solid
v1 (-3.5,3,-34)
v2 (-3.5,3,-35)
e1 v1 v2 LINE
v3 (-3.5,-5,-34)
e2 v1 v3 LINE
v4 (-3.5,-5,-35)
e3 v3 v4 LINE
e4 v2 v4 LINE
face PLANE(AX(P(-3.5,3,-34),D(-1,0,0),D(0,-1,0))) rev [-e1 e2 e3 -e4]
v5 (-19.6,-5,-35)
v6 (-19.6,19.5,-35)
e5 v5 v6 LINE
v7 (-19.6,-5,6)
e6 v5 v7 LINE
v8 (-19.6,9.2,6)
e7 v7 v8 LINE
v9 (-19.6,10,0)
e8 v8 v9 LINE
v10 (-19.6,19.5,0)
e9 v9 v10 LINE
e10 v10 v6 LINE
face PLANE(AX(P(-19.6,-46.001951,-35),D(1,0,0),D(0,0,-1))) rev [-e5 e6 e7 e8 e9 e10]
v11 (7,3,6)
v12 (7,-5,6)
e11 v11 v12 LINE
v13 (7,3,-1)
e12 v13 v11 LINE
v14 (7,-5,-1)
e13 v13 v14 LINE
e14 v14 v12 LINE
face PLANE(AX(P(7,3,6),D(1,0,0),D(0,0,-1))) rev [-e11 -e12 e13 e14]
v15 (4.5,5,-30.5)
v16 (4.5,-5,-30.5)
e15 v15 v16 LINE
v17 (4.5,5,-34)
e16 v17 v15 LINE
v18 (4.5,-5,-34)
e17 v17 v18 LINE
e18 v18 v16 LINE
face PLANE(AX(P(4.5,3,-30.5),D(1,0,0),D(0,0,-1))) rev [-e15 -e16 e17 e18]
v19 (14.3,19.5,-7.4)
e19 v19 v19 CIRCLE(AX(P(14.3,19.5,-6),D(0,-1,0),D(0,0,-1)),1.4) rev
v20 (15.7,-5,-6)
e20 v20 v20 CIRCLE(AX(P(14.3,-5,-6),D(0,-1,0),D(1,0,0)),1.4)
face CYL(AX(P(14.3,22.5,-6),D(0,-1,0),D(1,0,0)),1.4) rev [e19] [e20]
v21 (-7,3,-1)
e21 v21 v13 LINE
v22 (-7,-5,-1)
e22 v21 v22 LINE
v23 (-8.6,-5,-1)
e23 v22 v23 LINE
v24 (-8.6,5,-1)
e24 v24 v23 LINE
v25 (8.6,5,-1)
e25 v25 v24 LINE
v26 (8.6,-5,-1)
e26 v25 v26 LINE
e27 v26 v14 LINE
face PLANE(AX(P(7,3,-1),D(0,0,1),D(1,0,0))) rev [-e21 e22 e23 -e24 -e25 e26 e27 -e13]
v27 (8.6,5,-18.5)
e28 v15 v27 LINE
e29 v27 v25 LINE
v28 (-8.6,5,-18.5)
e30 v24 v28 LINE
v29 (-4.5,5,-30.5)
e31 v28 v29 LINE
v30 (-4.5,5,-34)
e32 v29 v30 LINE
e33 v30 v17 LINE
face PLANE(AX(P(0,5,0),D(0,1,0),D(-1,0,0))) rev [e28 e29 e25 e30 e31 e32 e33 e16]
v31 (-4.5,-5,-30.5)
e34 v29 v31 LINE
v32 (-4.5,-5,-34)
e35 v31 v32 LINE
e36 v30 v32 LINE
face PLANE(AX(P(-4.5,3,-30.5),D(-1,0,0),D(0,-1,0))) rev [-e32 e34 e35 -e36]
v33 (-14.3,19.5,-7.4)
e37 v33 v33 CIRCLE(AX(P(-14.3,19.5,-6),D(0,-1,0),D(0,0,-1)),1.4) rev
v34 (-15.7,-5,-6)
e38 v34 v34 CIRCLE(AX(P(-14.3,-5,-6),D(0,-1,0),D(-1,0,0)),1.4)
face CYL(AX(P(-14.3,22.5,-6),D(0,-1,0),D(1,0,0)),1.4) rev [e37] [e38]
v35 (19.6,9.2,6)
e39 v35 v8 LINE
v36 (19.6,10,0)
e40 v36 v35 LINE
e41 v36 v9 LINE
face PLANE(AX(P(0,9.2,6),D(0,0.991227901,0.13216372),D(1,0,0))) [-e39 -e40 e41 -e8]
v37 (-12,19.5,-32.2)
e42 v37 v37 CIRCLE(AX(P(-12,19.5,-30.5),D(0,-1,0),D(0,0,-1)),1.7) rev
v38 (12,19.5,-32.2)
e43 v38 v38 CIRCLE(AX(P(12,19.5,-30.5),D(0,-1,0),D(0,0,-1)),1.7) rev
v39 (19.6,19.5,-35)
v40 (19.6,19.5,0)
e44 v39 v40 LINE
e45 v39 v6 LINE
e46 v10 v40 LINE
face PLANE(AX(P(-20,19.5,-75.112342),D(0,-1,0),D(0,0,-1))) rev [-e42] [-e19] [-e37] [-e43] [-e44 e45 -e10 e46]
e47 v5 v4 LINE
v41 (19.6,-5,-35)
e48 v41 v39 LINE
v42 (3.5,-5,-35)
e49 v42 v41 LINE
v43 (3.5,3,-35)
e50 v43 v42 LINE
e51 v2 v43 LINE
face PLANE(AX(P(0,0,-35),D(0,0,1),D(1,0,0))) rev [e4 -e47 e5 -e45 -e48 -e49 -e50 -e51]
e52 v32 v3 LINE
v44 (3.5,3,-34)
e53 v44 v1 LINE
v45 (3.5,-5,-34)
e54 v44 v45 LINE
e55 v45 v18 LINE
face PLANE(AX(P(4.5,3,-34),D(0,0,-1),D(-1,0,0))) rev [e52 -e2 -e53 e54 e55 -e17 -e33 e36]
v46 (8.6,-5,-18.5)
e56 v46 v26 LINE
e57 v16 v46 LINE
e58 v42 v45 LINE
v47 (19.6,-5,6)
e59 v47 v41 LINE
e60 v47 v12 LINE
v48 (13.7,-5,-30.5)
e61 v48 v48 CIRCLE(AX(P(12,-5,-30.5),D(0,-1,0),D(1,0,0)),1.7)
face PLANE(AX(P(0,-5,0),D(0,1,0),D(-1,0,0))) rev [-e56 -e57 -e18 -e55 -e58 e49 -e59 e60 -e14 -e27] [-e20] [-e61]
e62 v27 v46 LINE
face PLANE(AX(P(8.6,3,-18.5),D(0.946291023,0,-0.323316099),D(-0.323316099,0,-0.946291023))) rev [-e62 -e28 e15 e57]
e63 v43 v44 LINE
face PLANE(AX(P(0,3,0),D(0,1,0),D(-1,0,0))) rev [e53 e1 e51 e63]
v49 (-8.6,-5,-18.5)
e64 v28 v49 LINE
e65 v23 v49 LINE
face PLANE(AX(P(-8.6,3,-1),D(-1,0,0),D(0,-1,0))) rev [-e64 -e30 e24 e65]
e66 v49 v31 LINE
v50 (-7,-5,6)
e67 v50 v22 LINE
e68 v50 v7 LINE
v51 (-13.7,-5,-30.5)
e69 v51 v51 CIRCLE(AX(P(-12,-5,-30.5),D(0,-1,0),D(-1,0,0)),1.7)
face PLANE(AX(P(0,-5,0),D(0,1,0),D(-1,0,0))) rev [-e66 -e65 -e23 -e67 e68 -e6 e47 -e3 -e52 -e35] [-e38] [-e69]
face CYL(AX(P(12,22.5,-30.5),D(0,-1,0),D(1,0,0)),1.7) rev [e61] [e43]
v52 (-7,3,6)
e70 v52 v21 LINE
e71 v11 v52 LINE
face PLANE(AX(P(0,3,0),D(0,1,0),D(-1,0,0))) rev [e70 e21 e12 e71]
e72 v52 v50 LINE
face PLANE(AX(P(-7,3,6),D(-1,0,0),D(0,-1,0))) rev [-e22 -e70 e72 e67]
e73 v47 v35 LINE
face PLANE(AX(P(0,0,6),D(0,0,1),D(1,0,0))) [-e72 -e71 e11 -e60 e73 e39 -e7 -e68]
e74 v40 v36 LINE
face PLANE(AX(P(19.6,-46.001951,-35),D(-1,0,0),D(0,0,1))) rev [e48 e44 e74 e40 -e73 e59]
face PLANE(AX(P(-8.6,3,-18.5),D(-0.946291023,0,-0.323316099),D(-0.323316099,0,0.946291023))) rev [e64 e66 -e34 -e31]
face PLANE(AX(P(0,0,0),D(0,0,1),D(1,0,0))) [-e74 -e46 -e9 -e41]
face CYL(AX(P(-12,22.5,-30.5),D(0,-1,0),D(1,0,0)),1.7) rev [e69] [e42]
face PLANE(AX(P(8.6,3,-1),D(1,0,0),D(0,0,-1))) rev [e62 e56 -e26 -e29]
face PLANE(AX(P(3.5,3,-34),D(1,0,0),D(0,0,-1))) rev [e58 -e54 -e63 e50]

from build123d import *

# Parameters (mm, degrees)
SKETCH_1_W          = 40
SKETCH_1_H          = 20
EXTRUDE_1_DEPTH     = 6
SKETCH_2_W          = 40
SKETCH_2_H          = 32.5
EXTRUDE_2_DEPTH     = 35
CUT_EXTRUDE_1_DEPTH = 13
CUT_EXTRUDE_2_DEPTH = 2
SKETCH_6_W          = 40
SKETCH_6_H          = 41
CUT_EXTRUDE_3_DEPTH = 5
SKETCH_8_R          = 1.7
SKETCH_8_R_2        = 1.4
CUT_EXTRUDE_4_DEPTH = 49.79805324
CUT_EXTRUDE_5_REACH = 48.165
SKETCH_9_W          = 40
SKETCH_9_H          = 3
CHAMFER_1_SIZE2     = 6
CHAMFER_1_SIZE      = 0.8
CUT_EXTRUDE_6_REACH = 49.173
SKETCH_11_W         = 0.4
SKETCH_11_H         = 41


with BuildPart() as part:
    # Эскиз1 → Бобышка-Вытянуть1 (new body)
    with BuildSketch(Plane.XY):
        Rectangle(SKETCH_1_W, SKETCH_1_H)
    extrude(amount=EXTRUDE_1_DEPTH)

    # Эскиз2 → Бобышка-Вытянуть2 (add)
    with BuildSketch(Plane(origin=(0, 0, 0), x_dir=(-1, 0, 0), z_dir=(0, 0, -1))):
        with Locations((0, 6.25)):
            Rectangle(SKETCH_2_W, SKETCH_2_H)
    extrude(amount=EXTRUDE_2_DEPTH)

    # Эскиз3 → Вырез-Вытянуть1 (cut)
    with BuildSketch(Plane.XZ.offset(10)):
        Polygon((-7, 6), (-7, -1), (-8.6, -1), (-8.6, -18.5), (-4.5, -30.5), (-4.5, -34), (-3.5, -34), (-3.5, -35), (3.5, -35), (3.5, -34), (4.5, -34), (4.5, -30.5), (8.6, -18.5), (8.6, -1), (7, -1), (7, 6), align=None)
    extrude(amount=-CUT_EXTRUDE_1_DEPTH, mode=Mode.SUBTRACT)

    # Эскиз5 → Вырез-Вытянуть2 (cut)
    with BuildSketch(Plane.XZ.offset(-3)):
        Polygon((-8.6, -1), (8.6, -1), (8.6, -18.5), (4.5, -30.5), (4.5, -34), (-4.5, -34), (-4.5, -30.5), (-8.6, -18.5), align=None)
    extrude(amount=-CUT_EXTRUDE_2_DEPTH, mode=Mode.SUBTRACT)

    # Эскиз6 → Вырез-Вытянуть3 (cut)
    with BuildSketch(Plane.XZ.offset(10)):
        with Locations((0, -14.5)):
            Rectangle(SKETCH_6_W, SKETCH_6_H)
    extrude(amount=-CUT_EXTRUDE_3_DEPTH, mode=Mode.SUBTRACT)

    # Эскиз8 → Вырез-Вытянуть4 (cut, through all)
    with BuildSketch(Plane.XZ.offset(5)):
        with Locations((12, -30.5)):
            Circle(SKETCH_8_R)
        with Locations((14.3, -6)):
            Circle(SKETCH_8_R_2)
        with Locations(Location((-12, -30.5, 0), (0, 0, 180))):
            Circle(SKETCH_8_R)
        with Locations(Location((-14.3, -6, 0), (0, 0, 180))):
            Circle(SKETCH_8_R_2)
    extrude(amount=-CUT_EXTRUDE_4_DEPTH, mode=Mode.SUBTRACT)

    # Вырез-Вытянуть5: up to this face of the body (flat: up to its plane)
    cut_extrude_5_end = Plane(part.part.faces().sort_by_distance((0, 9.272988506, -35))[0])
    # Эскиз9 → Вырез-Вытянуть5 (cut, up to the picked face)
    with BuildSketch(Plane.XY, mode=Mode.PRIVATE) as cut_extrude_5_sk1:
        with Locations((0, 21)):
            Rectangle(SKETCH_9_W, SKETCH_9_H)
    cut_extrude_5_tool1 = split(extrude(cut_extrude_5_sk1.sketch, amount=-CUT_EXTRUDE_5_REACH, mode=Mode.PRIVATE), bisect_by=cut_extrude_5_end, keep=Keep.BOTH, mode=Mode.PRIVATE)
    add(cut_extrude_5_tool1.solids().sort_by(Axis((0, 21, 0), (0, 0, -1)))[0], mode=Mode.SUBTRACT)

    # Фаска1
    chamfer_1_edges = [part.edges().sort_by_distance(p)[0] for p in [
        (0, 10, 6),
    ]]
    chamfer_1_side = [part.faces().sort_by_distance(p)[0] for p in [
        (0, 9.984, 6),
    ]]
    chamfer(chamfer_1_edges, length=CHAMFER_1_SIZE - 0.0001, length2=CHAMFER_1_SIZE2 - 0.0001, reference=chamfer_1_side[0])  # a hair under: the kernel refuses the full size

    # Вырез-Вытянуть6: up to this face of the body (flat: up to its plane)
    cut_extrude_6_end = Plane(part.part.faces().sort_by_distance((13.552984989, -5, -15.226398396))[0])
    # Эскиз11 → Вырез-Вытянуть6 (cut, up to the picked face)
    with BuildSketch(Plane(origin=(0, 19.5, 0), x_dir=(1, 0, 0), z_dir=(0, 1, 0)), mode=Mode.PRIVATE) as cut_extrude_6_sk1:
        with Locations((-19.8, 14.5)):
            Rectangle(SKETCH_11_W, SKETCH_11_H)
    cut_extrude_6_tool1 = split(extrude(cut_extrude_6_sk1.sketch, amount=-CUT_EXTRUDE_6_REACH, mode=Mode.PRIVATE), bisect_by=cut_extrude_6_end, keep=Keep.BOTH, mode=Mode.PRIVATE)
    # Эскиз11 → Вырез-Вытянуть6 (cut, up to the picked face)
    with BuildSketch(Plane(origin=(0, 19.5, 0), x_dir=(1, 0, 0), z_dir=(0, 1, 0)), mode=Mode.PRIVATE) as cut_extrude_6_sk2:
        with Locations((19.8, 14.5)):
            Rectangle(SKETCH_11_W, SKETCH_11_H)
    cut_extrude_6_tool2 = split(extrude(cut_extrude_6_sk2.sketch, amount=-CUT_EXTRUDE_6_REACH, mode=Mode.PRIVATE), bisect_by=cut_extrude_6_end, keep=Keep.BOTH, mode=Mode.PRIVATE)
    add(cut_extrude_6_tool1.solids().sort_by(Axis((-19.8, 19.5, -14.5), (0, -1, 0)))[0], mode=Mode.SUBTRACT)
    add(cut_extrude_6_tool2.solids().sort_by(Axis((19.8, 19.5, -14.5), (0, -1, 0)))[0], mode=Mode.SUBTRACT)


solid = part.part
